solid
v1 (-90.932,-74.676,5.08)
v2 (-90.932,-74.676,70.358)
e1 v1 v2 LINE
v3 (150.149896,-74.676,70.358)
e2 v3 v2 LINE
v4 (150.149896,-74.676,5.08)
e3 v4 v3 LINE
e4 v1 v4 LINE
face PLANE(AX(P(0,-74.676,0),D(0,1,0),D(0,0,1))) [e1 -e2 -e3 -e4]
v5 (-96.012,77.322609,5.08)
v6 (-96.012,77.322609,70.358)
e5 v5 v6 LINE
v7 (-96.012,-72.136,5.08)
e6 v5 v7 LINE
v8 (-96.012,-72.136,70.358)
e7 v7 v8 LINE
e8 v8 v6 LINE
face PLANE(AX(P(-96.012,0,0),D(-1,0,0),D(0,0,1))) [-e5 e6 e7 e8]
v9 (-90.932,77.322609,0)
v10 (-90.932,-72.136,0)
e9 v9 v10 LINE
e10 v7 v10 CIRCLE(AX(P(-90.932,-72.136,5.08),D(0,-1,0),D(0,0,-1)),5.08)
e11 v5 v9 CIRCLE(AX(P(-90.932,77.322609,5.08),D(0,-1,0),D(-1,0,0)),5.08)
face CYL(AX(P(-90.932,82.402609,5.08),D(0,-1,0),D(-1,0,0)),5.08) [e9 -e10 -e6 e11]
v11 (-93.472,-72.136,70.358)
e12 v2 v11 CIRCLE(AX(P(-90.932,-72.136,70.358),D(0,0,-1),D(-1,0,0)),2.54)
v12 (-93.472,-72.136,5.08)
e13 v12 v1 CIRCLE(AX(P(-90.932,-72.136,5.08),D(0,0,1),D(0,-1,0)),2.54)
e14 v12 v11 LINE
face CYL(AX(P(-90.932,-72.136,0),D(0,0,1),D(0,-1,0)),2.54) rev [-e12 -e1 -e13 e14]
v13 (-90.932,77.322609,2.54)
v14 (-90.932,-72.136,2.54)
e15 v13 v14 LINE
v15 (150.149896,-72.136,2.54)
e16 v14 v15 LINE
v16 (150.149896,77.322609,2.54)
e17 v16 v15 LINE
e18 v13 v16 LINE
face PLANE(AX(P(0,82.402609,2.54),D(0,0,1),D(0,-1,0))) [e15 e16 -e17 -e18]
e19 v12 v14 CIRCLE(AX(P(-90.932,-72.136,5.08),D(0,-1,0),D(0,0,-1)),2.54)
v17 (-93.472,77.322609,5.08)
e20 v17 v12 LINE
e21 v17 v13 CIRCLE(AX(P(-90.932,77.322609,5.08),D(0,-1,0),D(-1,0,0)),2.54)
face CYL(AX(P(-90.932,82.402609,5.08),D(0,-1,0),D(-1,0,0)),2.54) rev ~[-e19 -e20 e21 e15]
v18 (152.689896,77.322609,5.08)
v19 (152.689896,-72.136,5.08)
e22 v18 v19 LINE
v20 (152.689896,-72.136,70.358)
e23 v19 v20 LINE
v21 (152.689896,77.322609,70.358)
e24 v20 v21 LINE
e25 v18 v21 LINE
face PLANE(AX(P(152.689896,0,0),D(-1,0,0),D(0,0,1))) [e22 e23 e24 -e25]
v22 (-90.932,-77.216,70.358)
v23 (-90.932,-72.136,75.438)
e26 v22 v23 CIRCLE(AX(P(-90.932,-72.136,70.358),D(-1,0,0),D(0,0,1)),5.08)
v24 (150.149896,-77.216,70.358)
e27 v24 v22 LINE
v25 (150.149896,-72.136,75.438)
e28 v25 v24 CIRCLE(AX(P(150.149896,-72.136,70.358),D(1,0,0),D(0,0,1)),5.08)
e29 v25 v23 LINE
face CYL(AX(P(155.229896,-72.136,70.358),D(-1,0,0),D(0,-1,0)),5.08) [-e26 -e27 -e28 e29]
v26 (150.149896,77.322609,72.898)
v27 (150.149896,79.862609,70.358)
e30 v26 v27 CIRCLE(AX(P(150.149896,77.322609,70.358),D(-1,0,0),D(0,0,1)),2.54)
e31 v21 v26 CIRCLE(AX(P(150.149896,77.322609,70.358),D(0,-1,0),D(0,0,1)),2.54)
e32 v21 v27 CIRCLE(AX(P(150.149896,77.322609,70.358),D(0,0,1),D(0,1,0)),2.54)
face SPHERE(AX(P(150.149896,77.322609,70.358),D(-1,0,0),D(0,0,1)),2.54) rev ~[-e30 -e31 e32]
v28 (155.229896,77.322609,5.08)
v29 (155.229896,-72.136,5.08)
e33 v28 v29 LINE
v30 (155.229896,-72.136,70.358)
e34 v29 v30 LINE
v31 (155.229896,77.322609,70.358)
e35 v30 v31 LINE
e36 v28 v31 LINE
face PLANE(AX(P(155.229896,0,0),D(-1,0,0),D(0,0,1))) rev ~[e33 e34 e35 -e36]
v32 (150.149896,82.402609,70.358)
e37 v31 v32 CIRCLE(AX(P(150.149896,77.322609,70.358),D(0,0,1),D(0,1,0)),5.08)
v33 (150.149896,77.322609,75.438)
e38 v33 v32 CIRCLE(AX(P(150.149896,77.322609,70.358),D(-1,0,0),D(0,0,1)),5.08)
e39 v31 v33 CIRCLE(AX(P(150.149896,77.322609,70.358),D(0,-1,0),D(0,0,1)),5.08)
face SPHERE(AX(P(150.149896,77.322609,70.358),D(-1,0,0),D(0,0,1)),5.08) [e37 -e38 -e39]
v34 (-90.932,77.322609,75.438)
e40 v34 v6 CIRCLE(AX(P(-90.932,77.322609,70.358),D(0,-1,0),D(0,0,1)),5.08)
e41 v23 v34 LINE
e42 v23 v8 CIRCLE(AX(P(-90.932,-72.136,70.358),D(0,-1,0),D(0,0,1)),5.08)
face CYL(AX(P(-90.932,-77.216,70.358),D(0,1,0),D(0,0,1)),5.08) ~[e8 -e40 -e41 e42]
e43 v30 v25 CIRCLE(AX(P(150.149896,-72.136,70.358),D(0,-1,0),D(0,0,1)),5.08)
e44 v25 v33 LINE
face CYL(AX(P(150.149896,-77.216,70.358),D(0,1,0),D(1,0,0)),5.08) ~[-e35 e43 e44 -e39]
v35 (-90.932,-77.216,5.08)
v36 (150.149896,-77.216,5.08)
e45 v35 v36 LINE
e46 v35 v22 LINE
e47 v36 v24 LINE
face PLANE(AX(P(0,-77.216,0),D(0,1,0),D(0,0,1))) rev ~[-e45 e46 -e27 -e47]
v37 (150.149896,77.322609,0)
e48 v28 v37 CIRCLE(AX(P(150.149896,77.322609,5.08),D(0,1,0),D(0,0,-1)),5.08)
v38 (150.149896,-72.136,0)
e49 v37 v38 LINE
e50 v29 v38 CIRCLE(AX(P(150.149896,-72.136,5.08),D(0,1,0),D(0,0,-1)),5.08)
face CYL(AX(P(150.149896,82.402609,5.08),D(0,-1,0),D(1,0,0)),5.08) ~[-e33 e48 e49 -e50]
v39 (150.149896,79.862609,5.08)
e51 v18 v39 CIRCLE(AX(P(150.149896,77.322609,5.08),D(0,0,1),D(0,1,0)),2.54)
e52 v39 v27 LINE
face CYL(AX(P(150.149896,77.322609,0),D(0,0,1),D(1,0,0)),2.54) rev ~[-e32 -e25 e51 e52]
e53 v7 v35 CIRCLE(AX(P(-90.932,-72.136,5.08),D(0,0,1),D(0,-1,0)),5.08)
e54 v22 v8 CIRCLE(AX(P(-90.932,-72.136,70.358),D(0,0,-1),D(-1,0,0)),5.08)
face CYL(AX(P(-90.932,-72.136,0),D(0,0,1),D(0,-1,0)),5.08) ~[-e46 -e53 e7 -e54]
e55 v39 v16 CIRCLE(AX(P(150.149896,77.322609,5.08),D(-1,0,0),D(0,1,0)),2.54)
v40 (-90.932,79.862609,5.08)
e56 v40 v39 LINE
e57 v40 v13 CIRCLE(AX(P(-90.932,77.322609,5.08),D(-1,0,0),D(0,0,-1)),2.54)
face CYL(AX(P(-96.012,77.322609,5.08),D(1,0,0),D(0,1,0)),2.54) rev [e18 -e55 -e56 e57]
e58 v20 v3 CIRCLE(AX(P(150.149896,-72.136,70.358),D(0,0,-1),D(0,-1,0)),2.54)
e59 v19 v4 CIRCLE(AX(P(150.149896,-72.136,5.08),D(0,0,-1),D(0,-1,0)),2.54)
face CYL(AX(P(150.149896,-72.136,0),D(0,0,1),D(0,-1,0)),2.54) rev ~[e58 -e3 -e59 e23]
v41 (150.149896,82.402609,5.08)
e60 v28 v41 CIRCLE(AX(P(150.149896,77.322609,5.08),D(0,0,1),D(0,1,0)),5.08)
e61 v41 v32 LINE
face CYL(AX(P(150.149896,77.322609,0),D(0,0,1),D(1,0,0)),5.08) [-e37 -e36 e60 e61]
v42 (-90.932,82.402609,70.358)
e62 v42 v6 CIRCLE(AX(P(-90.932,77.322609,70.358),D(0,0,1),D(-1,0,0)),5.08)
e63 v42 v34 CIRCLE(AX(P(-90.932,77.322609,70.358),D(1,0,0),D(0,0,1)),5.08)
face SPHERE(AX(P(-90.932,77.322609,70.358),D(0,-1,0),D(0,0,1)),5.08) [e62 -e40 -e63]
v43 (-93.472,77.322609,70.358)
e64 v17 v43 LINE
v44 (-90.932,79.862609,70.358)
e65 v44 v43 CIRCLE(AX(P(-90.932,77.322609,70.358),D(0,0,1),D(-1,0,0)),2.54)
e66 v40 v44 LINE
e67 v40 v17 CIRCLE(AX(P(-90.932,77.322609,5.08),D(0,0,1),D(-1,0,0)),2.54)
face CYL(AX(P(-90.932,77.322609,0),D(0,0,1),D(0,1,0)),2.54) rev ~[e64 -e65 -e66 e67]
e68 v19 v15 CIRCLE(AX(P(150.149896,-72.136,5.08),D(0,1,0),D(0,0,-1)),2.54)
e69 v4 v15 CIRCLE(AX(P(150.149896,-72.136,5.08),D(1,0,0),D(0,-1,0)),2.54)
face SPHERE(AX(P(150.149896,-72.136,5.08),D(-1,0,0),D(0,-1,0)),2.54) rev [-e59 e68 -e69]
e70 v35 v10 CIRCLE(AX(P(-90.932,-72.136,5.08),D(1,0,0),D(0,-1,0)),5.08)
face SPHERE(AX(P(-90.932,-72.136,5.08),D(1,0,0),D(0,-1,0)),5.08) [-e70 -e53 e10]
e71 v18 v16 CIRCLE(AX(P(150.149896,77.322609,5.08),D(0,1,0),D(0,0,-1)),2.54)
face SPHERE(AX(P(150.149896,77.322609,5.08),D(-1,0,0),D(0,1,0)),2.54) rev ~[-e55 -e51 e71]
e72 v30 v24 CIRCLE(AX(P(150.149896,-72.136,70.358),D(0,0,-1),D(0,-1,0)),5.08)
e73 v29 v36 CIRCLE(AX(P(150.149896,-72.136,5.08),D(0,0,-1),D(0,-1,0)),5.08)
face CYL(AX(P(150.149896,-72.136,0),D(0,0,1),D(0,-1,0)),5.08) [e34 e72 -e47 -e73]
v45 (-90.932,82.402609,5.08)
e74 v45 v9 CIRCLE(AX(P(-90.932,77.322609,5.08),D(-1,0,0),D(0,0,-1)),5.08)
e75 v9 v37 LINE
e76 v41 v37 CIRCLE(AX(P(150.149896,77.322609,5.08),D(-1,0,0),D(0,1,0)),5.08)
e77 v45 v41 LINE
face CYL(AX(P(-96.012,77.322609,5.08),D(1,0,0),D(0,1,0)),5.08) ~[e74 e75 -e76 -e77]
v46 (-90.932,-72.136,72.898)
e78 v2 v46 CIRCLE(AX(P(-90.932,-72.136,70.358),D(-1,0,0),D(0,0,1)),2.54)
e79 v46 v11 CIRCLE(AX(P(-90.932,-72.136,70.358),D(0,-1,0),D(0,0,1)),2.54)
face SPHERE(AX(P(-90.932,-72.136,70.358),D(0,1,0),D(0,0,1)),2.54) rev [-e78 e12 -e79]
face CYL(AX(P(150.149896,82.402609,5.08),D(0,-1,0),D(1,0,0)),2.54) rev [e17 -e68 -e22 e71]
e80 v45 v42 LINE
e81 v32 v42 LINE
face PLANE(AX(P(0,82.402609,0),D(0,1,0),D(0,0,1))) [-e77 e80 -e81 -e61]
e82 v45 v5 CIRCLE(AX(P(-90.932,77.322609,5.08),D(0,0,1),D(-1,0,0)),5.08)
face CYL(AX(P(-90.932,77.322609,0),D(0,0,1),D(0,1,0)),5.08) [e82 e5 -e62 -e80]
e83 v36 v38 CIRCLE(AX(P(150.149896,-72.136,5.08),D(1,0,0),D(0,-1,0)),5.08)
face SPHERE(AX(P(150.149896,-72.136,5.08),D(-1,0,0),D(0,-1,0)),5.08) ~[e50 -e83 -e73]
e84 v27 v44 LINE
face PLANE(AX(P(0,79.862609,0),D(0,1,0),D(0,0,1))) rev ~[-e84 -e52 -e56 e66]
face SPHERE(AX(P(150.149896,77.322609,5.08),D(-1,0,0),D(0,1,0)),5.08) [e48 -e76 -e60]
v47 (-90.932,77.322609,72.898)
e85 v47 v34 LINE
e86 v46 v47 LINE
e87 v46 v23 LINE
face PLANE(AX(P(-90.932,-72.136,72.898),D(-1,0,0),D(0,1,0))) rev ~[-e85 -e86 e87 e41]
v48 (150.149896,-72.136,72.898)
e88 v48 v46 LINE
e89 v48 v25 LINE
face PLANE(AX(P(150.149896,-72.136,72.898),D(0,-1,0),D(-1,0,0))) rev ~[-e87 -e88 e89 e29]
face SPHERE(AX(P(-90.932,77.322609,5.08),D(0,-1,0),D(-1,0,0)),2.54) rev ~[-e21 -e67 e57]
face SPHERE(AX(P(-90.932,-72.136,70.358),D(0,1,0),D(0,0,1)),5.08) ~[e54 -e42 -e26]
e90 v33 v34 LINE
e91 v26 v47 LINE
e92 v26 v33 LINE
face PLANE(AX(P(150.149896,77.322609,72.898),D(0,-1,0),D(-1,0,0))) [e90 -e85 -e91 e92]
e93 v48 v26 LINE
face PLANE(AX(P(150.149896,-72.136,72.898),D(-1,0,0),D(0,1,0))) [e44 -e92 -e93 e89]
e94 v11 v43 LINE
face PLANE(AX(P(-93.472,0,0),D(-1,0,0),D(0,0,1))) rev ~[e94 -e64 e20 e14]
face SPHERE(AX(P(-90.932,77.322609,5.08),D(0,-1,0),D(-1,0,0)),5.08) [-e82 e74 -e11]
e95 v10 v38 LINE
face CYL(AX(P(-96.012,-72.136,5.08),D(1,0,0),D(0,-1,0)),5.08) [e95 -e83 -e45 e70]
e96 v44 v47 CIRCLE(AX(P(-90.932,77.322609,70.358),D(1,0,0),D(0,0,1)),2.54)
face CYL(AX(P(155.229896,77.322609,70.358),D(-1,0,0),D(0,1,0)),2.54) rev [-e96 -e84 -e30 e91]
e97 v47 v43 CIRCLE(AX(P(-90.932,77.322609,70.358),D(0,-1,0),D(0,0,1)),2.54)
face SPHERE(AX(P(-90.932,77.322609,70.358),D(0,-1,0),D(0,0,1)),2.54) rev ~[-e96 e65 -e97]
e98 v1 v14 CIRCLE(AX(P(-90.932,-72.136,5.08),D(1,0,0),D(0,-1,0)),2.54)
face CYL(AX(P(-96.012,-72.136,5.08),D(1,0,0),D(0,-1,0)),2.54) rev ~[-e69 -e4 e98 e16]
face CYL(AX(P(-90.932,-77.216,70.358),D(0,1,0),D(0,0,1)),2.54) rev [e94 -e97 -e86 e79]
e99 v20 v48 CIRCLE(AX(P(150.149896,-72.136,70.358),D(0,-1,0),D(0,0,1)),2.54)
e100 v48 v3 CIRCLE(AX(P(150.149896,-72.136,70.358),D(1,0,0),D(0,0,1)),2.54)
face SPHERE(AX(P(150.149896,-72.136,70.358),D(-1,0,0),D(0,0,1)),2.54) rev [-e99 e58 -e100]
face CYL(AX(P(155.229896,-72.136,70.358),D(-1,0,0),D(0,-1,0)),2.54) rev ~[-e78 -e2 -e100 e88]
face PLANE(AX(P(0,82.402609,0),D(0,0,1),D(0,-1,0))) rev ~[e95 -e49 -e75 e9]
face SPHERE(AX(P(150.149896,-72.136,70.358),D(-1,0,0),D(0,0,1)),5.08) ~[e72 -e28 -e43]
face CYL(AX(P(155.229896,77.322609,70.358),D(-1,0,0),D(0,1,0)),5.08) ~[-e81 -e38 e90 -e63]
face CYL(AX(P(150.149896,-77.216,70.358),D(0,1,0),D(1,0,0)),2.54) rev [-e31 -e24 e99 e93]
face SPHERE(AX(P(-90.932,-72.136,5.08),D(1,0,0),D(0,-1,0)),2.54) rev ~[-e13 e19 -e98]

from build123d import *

# Parameters (mm, degrees)
F0_W     = 155.229896307
F0_H     = 82.4026092887
F1_DEPTH = 75.438
F2_DEPTH = 77.216
F3_DEPTH = 96.012
F4_R     = 5.08
F5_T     = -2.54
F6_R     = 16.8009840587
F7_DEPTH = 2.54


# Not quite as in the source:
# - a shell that OpenCascade refuses in one call is made with other operations: the cavity is built on its own and cut out


with BuildPart() as f1:
    # F0 (on Top) → F1 (new body)
    with BuildSketch(Plane.XY):
        with Locations((77.6149481535, 41.2013046443)):
            Rectangle(F0_W, F0_H)
    extrude(amount=F1_DEPTH)

    # F2 (add): a face of the model
    f2_faces = [f1.faces().sort_by_distance(p)[0] for p in [
        (77.6149481535, 0, 37.719),
    ]]
    extrude(f2_faces, amount=F2_DEPTH)

    # F3 (add): a face of the model
    f3_faces = [f1.faces().sort_by_distance(p)[0] for p in [
        (0, 2.5933046443, 37.719),
    ]]
    extrude(f3_faces, amount=F3_DEPTH)

    # F4
    f4_edges = [f1.edges().sort_by_distance(p)[0] for p in [
        (-96.012, 2.593305, 75.438),
        (29.608948, -77.216, 75.438),
        (29.608948, -77.216, 0),
        (-96.012, -77.216, 37.719),
        (-96.012, 2.593305, 0),
        (29.608948, 82.402609, 75.438),
        (155.229896, 2.593305, 75.438),
        (155.229896, -77.216, 37.719),
        (-96.012, 82.402609, 37.719),
        (29.608948, 82.402609, 0),
        (155.229896, 82.402609, 37.719),
        (155.229896, 2.593305, 0),
    ]]
    fillet(f4_edges, radius=F4_R)

    # F5: a shell. OpenCascade refuses it in one call, so the cavity is built on its own and cut out:
    # the body offset inwards by the wall thickness, plus a prism from it out through each open face.
    f5_core = offset(f1.part, amount=F5_T, mode=Mode.PRIVATE)
    f5_exits = [f5_core.faces().sort_by_distance(p)[0] for p in [
        (29.608948, 2.593305, 72.898),
    ]]
    add(f5_core, mode=Mode.SUBTRACT)
    extrude(f5_exits, amount=-F5_T, mode=Mode.SUBTRACT)

    # F6 (on face) → F7 (join, through all)
    with BuildSketch(Plane.YZ.offset(155.229896307)):
        with Locations((0, 37.719)):
            Circle(F6_R)
    extrude(amount=-F7_DEPTH)


solid = f1.part
